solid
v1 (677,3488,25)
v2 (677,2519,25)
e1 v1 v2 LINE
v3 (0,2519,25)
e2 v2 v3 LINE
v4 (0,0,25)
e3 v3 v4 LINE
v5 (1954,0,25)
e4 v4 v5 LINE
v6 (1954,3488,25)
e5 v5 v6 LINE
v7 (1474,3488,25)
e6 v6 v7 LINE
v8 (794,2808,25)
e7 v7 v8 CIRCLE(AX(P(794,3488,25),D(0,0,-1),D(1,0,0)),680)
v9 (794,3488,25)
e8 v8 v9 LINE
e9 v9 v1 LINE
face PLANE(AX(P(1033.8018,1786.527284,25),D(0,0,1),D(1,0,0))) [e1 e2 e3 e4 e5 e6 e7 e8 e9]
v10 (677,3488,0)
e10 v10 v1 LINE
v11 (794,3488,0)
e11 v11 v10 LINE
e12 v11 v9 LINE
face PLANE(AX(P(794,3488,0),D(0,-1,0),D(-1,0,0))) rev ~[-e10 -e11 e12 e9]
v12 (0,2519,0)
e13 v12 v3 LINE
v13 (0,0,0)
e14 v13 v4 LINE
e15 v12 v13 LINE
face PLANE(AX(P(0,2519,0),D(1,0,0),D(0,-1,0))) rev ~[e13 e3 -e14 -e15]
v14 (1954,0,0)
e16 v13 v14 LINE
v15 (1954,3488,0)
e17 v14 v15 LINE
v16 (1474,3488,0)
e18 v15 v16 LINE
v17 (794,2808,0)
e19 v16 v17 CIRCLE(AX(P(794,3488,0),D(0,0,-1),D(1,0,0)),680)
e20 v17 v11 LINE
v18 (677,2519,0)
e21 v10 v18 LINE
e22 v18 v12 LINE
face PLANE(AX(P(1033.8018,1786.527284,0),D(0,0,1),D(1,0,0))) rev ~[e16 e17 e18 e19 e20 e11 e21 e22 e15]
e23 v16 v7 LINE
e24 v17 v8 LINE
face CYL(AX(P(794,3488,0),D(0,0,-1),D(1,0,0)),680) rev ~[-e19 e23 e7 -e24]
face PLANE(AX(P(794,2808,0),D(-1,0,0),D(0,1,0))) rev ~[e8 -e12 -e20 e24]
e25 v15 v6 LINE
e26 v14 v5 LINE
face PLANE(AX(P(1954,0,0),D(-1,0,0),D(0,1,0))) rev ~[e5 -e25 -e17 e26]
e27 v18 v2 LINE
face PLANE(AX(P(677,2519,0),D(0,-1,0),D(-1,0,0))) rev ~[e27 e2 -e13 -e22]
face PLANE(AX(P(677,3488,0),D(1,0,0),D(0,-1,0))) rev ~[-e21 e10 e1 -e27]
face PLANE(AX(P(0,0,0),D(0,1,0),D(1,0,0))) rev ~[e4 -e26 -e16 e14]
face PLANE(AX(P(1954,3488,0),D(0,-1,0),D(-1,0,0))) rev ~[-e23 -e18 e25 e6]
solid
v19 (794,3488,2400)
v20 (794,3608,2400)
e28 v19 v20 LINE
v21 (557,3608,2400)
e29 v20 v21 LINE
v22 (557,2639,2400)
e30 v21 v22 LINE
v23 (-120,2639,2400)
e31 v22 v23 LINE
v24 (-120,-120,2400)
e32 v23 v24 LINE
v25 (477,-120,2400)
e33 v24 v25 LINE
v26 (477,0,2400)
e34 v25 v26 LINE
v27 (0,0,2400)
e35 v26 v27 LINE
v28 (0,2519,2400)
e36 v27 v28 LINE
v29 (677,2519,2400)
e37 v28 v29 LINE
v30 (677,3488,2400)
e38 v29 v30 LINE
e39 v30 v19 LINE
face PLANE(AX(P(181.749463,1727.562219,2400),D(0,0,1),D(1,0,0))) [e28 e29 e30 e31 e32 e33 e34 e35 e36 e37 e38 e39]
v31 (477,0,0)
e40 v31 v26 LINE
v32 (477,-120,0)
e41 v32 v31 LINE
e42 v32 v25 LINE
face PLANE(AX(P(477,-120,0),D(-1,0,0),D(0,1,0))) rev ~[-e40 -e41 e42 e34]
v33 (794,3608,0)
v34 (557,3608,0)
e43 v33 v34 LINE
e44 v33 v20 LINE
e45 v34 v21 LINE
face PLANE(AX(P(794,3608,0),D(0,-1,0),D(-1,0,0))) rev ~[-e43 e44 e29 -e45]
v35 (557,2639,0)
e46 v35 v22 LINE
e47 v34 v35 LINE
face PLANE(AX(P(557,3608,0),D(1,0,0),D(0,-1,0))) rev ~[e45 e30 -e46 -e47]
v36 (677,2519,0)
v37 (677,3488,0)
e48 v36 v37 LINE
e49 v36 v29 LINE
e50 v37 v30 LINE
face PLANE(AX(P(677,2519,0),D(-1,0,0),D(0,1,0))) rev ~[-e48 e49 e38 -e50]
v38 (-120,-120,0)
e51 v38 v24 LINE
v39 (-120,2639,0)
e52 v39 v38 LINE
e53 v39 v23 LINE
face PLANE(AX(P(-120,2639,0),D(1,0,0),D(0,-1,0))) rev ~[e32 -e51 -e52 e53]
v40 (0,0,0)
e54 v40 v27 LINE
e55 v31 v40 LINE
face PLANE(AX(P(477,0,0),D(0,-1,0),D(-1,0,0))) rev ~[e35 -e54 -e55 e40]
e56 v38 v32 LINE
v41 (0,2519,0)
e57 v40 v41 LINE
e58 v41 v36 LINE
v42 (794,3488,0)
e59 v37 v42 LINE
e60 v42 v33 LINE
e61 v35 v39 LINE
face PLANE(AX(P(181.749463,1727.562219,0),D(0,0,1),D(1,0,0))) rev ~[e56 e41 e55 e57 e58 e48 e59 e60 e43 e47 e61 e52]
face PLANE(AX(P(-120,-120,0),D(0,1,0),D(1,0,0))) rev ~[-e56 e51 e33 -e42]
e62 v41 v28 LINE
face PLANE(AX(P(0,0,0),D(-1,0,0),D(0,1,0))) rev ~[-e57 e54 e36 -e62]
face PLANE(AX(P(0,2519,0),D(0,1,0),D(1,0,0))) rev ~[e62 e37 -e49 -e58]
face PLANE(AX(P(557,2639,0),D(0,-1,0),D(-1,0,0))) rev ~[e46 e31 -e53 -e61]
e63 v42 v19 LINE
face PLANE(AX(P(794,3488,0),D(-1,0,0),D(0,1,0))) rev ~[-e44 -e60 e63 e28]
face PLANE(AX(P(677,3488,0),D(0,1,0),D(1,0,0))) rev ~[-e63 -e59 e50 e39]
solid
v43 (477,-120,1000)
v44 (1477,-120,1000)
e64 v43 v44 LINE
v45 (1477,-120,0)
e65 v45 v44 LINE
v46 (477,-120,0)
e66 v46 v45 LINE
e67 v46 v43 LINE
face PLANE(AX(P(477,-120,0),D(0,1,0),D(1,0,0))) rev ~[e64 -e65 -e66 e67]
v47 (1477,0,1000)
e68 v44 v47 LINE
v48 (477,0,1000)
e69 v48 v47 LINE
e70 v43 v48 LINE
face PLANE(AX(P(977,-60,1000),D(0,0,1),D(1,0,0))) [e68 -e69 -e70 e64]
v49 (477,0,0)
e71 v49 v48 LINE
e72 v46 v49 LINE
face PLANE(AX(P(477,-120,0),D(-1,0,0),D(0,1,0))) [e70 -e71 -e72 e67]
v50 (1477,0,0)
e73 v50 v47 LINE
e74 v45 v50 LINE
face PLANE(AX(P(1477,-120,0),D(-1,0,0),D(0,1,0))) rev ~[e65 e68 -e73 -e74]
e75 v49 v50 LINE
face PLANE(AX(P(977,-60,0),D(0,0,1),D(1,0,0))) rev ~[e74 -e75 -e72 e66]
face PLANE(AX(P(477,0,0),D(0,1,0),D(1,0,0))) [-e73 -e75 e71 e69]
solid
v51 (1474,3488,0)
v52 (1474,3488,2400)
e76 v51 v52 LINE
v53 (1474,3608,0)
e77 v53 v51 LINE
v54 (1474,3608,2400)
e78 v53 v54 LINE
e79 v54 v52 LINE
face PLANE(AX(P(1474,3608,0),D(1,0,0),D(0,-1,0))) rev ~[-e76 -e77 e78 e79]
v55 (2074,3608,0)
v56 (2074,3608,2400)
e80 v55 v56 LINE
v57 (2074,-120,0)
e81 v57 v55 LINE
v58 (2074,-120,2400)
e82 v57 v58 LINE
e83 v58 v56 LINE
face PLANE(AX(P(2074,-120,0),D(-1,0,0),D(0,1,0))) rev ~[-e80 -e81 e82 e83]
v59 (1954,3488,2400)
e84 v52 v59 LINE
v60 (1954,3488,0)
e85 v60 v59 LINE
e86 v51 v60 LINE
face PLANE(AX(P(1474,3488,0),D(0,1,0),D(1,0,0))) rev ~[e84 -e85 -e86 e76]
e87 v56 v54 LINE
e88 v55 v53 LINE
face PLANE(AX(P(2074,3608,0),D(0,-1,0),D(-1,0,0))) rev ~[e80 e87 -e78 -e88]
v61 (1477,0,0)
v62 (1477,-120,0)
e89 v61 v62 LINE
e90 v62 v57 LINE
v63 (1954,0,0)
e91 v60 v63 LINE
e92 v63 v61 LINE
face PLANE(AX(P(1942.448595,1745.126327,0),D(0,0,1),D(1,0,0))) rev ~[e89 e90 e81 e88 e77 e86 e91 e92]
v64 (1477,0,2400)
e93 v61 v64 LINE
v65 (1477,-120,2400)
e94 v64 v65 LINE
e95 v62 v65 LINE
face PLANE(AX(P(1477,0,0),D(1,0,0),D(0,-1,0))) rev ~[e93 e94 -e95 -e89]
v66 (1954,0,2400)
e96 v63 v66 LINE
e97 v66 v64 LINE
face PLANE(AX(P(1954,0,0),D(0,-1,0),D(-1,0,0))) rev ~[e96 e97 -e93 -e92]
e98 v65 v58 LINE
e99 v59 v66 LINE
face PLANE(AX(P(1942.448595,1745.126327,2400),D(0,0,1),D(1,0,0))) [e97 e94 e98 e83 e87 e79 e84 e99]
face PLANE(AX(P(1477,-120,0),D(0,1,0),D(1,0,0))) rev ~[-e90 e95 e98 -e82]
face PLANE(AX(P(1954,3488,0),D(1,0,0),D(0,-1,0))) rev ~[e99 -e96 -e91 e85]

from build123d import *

# Parameters (mm, degrees)
F1_DEPTH = 2400
F0_W     = 1000
F0_H     = 120
F2_DEPTH = 1000
F4_DEPTH = 25


# Not quite as in the source:
# - a feature of the source that left no trace in its solid (it failed there, or was rolled back) is left out


with BuildPart() as f1:
    # F0 (on Top) → F1 (new body)
    with BuildSketch(Plane.XY):
        Polygon((1954, 0), (1477, 0), (1477, -120), (2074, -120), (2074, 3608), (1474, 3608), (1474, 3488), (1954, 3488), align=None)
    extrude(amount=F1_DEPTH)


with BuildPart() as f1b:
    # F0 (on Top) → F1, piece 2 (new body)
    with BuildSketch(Plane.XY):
        Polygon((398.1228470802, 0), (0, 0), (0, 2519), (677, 2519), (677, 3488), (794, 3488), (794, 3608), (677, 3608), (557, 3608), (557, 2639), (-120, 2639), (-120, 2519), (-120, -120), (398.1228470802, -120), (477, -120), (477, 0), align=None)
    extrude(amount=F1_DEPTH)


with BuildPart() as f2:
    # F0 (on Top) → F2 (new body)
    with BuildSketch(Plane.XY):
        with Locations((977, -60)):
            Rectangle(F0_W, F0_H)
    extrude(amount=F2_DEPTH)


with BuildPart() as f4:
    # F0 (on Top) → F4 (new body)
    with BuildSketch(Plane.XY):
        with BuildLine():
            Line((0, 2519), (0, 0))
            Line((0, 0), (398.1228470802, 0))
            Line((398.1228470802, 0), (477, 0))
            Line((477, 0), (1477, 0))
            Line((1477, 0), (1954, 0))
            Line((1954, 0), (1954, 3488))
            Line((1954, 3488), (1474, 3488))
            ThreePointArc((1474, 3488), (1274.8326112069, 3007.1673887931), (794, 2808))
            Line((794, 2808), (794, 3488))
            Line((794, 3488), (677, 3488))
            Line((677, 3488), (677, 2519))
            Line((677, 2519), (0, 2519))
        make_face()
    extrude(amount=F4_DEPTH)


solid = Compound([f1.part, f1b.part, f2.part, f4.part])
